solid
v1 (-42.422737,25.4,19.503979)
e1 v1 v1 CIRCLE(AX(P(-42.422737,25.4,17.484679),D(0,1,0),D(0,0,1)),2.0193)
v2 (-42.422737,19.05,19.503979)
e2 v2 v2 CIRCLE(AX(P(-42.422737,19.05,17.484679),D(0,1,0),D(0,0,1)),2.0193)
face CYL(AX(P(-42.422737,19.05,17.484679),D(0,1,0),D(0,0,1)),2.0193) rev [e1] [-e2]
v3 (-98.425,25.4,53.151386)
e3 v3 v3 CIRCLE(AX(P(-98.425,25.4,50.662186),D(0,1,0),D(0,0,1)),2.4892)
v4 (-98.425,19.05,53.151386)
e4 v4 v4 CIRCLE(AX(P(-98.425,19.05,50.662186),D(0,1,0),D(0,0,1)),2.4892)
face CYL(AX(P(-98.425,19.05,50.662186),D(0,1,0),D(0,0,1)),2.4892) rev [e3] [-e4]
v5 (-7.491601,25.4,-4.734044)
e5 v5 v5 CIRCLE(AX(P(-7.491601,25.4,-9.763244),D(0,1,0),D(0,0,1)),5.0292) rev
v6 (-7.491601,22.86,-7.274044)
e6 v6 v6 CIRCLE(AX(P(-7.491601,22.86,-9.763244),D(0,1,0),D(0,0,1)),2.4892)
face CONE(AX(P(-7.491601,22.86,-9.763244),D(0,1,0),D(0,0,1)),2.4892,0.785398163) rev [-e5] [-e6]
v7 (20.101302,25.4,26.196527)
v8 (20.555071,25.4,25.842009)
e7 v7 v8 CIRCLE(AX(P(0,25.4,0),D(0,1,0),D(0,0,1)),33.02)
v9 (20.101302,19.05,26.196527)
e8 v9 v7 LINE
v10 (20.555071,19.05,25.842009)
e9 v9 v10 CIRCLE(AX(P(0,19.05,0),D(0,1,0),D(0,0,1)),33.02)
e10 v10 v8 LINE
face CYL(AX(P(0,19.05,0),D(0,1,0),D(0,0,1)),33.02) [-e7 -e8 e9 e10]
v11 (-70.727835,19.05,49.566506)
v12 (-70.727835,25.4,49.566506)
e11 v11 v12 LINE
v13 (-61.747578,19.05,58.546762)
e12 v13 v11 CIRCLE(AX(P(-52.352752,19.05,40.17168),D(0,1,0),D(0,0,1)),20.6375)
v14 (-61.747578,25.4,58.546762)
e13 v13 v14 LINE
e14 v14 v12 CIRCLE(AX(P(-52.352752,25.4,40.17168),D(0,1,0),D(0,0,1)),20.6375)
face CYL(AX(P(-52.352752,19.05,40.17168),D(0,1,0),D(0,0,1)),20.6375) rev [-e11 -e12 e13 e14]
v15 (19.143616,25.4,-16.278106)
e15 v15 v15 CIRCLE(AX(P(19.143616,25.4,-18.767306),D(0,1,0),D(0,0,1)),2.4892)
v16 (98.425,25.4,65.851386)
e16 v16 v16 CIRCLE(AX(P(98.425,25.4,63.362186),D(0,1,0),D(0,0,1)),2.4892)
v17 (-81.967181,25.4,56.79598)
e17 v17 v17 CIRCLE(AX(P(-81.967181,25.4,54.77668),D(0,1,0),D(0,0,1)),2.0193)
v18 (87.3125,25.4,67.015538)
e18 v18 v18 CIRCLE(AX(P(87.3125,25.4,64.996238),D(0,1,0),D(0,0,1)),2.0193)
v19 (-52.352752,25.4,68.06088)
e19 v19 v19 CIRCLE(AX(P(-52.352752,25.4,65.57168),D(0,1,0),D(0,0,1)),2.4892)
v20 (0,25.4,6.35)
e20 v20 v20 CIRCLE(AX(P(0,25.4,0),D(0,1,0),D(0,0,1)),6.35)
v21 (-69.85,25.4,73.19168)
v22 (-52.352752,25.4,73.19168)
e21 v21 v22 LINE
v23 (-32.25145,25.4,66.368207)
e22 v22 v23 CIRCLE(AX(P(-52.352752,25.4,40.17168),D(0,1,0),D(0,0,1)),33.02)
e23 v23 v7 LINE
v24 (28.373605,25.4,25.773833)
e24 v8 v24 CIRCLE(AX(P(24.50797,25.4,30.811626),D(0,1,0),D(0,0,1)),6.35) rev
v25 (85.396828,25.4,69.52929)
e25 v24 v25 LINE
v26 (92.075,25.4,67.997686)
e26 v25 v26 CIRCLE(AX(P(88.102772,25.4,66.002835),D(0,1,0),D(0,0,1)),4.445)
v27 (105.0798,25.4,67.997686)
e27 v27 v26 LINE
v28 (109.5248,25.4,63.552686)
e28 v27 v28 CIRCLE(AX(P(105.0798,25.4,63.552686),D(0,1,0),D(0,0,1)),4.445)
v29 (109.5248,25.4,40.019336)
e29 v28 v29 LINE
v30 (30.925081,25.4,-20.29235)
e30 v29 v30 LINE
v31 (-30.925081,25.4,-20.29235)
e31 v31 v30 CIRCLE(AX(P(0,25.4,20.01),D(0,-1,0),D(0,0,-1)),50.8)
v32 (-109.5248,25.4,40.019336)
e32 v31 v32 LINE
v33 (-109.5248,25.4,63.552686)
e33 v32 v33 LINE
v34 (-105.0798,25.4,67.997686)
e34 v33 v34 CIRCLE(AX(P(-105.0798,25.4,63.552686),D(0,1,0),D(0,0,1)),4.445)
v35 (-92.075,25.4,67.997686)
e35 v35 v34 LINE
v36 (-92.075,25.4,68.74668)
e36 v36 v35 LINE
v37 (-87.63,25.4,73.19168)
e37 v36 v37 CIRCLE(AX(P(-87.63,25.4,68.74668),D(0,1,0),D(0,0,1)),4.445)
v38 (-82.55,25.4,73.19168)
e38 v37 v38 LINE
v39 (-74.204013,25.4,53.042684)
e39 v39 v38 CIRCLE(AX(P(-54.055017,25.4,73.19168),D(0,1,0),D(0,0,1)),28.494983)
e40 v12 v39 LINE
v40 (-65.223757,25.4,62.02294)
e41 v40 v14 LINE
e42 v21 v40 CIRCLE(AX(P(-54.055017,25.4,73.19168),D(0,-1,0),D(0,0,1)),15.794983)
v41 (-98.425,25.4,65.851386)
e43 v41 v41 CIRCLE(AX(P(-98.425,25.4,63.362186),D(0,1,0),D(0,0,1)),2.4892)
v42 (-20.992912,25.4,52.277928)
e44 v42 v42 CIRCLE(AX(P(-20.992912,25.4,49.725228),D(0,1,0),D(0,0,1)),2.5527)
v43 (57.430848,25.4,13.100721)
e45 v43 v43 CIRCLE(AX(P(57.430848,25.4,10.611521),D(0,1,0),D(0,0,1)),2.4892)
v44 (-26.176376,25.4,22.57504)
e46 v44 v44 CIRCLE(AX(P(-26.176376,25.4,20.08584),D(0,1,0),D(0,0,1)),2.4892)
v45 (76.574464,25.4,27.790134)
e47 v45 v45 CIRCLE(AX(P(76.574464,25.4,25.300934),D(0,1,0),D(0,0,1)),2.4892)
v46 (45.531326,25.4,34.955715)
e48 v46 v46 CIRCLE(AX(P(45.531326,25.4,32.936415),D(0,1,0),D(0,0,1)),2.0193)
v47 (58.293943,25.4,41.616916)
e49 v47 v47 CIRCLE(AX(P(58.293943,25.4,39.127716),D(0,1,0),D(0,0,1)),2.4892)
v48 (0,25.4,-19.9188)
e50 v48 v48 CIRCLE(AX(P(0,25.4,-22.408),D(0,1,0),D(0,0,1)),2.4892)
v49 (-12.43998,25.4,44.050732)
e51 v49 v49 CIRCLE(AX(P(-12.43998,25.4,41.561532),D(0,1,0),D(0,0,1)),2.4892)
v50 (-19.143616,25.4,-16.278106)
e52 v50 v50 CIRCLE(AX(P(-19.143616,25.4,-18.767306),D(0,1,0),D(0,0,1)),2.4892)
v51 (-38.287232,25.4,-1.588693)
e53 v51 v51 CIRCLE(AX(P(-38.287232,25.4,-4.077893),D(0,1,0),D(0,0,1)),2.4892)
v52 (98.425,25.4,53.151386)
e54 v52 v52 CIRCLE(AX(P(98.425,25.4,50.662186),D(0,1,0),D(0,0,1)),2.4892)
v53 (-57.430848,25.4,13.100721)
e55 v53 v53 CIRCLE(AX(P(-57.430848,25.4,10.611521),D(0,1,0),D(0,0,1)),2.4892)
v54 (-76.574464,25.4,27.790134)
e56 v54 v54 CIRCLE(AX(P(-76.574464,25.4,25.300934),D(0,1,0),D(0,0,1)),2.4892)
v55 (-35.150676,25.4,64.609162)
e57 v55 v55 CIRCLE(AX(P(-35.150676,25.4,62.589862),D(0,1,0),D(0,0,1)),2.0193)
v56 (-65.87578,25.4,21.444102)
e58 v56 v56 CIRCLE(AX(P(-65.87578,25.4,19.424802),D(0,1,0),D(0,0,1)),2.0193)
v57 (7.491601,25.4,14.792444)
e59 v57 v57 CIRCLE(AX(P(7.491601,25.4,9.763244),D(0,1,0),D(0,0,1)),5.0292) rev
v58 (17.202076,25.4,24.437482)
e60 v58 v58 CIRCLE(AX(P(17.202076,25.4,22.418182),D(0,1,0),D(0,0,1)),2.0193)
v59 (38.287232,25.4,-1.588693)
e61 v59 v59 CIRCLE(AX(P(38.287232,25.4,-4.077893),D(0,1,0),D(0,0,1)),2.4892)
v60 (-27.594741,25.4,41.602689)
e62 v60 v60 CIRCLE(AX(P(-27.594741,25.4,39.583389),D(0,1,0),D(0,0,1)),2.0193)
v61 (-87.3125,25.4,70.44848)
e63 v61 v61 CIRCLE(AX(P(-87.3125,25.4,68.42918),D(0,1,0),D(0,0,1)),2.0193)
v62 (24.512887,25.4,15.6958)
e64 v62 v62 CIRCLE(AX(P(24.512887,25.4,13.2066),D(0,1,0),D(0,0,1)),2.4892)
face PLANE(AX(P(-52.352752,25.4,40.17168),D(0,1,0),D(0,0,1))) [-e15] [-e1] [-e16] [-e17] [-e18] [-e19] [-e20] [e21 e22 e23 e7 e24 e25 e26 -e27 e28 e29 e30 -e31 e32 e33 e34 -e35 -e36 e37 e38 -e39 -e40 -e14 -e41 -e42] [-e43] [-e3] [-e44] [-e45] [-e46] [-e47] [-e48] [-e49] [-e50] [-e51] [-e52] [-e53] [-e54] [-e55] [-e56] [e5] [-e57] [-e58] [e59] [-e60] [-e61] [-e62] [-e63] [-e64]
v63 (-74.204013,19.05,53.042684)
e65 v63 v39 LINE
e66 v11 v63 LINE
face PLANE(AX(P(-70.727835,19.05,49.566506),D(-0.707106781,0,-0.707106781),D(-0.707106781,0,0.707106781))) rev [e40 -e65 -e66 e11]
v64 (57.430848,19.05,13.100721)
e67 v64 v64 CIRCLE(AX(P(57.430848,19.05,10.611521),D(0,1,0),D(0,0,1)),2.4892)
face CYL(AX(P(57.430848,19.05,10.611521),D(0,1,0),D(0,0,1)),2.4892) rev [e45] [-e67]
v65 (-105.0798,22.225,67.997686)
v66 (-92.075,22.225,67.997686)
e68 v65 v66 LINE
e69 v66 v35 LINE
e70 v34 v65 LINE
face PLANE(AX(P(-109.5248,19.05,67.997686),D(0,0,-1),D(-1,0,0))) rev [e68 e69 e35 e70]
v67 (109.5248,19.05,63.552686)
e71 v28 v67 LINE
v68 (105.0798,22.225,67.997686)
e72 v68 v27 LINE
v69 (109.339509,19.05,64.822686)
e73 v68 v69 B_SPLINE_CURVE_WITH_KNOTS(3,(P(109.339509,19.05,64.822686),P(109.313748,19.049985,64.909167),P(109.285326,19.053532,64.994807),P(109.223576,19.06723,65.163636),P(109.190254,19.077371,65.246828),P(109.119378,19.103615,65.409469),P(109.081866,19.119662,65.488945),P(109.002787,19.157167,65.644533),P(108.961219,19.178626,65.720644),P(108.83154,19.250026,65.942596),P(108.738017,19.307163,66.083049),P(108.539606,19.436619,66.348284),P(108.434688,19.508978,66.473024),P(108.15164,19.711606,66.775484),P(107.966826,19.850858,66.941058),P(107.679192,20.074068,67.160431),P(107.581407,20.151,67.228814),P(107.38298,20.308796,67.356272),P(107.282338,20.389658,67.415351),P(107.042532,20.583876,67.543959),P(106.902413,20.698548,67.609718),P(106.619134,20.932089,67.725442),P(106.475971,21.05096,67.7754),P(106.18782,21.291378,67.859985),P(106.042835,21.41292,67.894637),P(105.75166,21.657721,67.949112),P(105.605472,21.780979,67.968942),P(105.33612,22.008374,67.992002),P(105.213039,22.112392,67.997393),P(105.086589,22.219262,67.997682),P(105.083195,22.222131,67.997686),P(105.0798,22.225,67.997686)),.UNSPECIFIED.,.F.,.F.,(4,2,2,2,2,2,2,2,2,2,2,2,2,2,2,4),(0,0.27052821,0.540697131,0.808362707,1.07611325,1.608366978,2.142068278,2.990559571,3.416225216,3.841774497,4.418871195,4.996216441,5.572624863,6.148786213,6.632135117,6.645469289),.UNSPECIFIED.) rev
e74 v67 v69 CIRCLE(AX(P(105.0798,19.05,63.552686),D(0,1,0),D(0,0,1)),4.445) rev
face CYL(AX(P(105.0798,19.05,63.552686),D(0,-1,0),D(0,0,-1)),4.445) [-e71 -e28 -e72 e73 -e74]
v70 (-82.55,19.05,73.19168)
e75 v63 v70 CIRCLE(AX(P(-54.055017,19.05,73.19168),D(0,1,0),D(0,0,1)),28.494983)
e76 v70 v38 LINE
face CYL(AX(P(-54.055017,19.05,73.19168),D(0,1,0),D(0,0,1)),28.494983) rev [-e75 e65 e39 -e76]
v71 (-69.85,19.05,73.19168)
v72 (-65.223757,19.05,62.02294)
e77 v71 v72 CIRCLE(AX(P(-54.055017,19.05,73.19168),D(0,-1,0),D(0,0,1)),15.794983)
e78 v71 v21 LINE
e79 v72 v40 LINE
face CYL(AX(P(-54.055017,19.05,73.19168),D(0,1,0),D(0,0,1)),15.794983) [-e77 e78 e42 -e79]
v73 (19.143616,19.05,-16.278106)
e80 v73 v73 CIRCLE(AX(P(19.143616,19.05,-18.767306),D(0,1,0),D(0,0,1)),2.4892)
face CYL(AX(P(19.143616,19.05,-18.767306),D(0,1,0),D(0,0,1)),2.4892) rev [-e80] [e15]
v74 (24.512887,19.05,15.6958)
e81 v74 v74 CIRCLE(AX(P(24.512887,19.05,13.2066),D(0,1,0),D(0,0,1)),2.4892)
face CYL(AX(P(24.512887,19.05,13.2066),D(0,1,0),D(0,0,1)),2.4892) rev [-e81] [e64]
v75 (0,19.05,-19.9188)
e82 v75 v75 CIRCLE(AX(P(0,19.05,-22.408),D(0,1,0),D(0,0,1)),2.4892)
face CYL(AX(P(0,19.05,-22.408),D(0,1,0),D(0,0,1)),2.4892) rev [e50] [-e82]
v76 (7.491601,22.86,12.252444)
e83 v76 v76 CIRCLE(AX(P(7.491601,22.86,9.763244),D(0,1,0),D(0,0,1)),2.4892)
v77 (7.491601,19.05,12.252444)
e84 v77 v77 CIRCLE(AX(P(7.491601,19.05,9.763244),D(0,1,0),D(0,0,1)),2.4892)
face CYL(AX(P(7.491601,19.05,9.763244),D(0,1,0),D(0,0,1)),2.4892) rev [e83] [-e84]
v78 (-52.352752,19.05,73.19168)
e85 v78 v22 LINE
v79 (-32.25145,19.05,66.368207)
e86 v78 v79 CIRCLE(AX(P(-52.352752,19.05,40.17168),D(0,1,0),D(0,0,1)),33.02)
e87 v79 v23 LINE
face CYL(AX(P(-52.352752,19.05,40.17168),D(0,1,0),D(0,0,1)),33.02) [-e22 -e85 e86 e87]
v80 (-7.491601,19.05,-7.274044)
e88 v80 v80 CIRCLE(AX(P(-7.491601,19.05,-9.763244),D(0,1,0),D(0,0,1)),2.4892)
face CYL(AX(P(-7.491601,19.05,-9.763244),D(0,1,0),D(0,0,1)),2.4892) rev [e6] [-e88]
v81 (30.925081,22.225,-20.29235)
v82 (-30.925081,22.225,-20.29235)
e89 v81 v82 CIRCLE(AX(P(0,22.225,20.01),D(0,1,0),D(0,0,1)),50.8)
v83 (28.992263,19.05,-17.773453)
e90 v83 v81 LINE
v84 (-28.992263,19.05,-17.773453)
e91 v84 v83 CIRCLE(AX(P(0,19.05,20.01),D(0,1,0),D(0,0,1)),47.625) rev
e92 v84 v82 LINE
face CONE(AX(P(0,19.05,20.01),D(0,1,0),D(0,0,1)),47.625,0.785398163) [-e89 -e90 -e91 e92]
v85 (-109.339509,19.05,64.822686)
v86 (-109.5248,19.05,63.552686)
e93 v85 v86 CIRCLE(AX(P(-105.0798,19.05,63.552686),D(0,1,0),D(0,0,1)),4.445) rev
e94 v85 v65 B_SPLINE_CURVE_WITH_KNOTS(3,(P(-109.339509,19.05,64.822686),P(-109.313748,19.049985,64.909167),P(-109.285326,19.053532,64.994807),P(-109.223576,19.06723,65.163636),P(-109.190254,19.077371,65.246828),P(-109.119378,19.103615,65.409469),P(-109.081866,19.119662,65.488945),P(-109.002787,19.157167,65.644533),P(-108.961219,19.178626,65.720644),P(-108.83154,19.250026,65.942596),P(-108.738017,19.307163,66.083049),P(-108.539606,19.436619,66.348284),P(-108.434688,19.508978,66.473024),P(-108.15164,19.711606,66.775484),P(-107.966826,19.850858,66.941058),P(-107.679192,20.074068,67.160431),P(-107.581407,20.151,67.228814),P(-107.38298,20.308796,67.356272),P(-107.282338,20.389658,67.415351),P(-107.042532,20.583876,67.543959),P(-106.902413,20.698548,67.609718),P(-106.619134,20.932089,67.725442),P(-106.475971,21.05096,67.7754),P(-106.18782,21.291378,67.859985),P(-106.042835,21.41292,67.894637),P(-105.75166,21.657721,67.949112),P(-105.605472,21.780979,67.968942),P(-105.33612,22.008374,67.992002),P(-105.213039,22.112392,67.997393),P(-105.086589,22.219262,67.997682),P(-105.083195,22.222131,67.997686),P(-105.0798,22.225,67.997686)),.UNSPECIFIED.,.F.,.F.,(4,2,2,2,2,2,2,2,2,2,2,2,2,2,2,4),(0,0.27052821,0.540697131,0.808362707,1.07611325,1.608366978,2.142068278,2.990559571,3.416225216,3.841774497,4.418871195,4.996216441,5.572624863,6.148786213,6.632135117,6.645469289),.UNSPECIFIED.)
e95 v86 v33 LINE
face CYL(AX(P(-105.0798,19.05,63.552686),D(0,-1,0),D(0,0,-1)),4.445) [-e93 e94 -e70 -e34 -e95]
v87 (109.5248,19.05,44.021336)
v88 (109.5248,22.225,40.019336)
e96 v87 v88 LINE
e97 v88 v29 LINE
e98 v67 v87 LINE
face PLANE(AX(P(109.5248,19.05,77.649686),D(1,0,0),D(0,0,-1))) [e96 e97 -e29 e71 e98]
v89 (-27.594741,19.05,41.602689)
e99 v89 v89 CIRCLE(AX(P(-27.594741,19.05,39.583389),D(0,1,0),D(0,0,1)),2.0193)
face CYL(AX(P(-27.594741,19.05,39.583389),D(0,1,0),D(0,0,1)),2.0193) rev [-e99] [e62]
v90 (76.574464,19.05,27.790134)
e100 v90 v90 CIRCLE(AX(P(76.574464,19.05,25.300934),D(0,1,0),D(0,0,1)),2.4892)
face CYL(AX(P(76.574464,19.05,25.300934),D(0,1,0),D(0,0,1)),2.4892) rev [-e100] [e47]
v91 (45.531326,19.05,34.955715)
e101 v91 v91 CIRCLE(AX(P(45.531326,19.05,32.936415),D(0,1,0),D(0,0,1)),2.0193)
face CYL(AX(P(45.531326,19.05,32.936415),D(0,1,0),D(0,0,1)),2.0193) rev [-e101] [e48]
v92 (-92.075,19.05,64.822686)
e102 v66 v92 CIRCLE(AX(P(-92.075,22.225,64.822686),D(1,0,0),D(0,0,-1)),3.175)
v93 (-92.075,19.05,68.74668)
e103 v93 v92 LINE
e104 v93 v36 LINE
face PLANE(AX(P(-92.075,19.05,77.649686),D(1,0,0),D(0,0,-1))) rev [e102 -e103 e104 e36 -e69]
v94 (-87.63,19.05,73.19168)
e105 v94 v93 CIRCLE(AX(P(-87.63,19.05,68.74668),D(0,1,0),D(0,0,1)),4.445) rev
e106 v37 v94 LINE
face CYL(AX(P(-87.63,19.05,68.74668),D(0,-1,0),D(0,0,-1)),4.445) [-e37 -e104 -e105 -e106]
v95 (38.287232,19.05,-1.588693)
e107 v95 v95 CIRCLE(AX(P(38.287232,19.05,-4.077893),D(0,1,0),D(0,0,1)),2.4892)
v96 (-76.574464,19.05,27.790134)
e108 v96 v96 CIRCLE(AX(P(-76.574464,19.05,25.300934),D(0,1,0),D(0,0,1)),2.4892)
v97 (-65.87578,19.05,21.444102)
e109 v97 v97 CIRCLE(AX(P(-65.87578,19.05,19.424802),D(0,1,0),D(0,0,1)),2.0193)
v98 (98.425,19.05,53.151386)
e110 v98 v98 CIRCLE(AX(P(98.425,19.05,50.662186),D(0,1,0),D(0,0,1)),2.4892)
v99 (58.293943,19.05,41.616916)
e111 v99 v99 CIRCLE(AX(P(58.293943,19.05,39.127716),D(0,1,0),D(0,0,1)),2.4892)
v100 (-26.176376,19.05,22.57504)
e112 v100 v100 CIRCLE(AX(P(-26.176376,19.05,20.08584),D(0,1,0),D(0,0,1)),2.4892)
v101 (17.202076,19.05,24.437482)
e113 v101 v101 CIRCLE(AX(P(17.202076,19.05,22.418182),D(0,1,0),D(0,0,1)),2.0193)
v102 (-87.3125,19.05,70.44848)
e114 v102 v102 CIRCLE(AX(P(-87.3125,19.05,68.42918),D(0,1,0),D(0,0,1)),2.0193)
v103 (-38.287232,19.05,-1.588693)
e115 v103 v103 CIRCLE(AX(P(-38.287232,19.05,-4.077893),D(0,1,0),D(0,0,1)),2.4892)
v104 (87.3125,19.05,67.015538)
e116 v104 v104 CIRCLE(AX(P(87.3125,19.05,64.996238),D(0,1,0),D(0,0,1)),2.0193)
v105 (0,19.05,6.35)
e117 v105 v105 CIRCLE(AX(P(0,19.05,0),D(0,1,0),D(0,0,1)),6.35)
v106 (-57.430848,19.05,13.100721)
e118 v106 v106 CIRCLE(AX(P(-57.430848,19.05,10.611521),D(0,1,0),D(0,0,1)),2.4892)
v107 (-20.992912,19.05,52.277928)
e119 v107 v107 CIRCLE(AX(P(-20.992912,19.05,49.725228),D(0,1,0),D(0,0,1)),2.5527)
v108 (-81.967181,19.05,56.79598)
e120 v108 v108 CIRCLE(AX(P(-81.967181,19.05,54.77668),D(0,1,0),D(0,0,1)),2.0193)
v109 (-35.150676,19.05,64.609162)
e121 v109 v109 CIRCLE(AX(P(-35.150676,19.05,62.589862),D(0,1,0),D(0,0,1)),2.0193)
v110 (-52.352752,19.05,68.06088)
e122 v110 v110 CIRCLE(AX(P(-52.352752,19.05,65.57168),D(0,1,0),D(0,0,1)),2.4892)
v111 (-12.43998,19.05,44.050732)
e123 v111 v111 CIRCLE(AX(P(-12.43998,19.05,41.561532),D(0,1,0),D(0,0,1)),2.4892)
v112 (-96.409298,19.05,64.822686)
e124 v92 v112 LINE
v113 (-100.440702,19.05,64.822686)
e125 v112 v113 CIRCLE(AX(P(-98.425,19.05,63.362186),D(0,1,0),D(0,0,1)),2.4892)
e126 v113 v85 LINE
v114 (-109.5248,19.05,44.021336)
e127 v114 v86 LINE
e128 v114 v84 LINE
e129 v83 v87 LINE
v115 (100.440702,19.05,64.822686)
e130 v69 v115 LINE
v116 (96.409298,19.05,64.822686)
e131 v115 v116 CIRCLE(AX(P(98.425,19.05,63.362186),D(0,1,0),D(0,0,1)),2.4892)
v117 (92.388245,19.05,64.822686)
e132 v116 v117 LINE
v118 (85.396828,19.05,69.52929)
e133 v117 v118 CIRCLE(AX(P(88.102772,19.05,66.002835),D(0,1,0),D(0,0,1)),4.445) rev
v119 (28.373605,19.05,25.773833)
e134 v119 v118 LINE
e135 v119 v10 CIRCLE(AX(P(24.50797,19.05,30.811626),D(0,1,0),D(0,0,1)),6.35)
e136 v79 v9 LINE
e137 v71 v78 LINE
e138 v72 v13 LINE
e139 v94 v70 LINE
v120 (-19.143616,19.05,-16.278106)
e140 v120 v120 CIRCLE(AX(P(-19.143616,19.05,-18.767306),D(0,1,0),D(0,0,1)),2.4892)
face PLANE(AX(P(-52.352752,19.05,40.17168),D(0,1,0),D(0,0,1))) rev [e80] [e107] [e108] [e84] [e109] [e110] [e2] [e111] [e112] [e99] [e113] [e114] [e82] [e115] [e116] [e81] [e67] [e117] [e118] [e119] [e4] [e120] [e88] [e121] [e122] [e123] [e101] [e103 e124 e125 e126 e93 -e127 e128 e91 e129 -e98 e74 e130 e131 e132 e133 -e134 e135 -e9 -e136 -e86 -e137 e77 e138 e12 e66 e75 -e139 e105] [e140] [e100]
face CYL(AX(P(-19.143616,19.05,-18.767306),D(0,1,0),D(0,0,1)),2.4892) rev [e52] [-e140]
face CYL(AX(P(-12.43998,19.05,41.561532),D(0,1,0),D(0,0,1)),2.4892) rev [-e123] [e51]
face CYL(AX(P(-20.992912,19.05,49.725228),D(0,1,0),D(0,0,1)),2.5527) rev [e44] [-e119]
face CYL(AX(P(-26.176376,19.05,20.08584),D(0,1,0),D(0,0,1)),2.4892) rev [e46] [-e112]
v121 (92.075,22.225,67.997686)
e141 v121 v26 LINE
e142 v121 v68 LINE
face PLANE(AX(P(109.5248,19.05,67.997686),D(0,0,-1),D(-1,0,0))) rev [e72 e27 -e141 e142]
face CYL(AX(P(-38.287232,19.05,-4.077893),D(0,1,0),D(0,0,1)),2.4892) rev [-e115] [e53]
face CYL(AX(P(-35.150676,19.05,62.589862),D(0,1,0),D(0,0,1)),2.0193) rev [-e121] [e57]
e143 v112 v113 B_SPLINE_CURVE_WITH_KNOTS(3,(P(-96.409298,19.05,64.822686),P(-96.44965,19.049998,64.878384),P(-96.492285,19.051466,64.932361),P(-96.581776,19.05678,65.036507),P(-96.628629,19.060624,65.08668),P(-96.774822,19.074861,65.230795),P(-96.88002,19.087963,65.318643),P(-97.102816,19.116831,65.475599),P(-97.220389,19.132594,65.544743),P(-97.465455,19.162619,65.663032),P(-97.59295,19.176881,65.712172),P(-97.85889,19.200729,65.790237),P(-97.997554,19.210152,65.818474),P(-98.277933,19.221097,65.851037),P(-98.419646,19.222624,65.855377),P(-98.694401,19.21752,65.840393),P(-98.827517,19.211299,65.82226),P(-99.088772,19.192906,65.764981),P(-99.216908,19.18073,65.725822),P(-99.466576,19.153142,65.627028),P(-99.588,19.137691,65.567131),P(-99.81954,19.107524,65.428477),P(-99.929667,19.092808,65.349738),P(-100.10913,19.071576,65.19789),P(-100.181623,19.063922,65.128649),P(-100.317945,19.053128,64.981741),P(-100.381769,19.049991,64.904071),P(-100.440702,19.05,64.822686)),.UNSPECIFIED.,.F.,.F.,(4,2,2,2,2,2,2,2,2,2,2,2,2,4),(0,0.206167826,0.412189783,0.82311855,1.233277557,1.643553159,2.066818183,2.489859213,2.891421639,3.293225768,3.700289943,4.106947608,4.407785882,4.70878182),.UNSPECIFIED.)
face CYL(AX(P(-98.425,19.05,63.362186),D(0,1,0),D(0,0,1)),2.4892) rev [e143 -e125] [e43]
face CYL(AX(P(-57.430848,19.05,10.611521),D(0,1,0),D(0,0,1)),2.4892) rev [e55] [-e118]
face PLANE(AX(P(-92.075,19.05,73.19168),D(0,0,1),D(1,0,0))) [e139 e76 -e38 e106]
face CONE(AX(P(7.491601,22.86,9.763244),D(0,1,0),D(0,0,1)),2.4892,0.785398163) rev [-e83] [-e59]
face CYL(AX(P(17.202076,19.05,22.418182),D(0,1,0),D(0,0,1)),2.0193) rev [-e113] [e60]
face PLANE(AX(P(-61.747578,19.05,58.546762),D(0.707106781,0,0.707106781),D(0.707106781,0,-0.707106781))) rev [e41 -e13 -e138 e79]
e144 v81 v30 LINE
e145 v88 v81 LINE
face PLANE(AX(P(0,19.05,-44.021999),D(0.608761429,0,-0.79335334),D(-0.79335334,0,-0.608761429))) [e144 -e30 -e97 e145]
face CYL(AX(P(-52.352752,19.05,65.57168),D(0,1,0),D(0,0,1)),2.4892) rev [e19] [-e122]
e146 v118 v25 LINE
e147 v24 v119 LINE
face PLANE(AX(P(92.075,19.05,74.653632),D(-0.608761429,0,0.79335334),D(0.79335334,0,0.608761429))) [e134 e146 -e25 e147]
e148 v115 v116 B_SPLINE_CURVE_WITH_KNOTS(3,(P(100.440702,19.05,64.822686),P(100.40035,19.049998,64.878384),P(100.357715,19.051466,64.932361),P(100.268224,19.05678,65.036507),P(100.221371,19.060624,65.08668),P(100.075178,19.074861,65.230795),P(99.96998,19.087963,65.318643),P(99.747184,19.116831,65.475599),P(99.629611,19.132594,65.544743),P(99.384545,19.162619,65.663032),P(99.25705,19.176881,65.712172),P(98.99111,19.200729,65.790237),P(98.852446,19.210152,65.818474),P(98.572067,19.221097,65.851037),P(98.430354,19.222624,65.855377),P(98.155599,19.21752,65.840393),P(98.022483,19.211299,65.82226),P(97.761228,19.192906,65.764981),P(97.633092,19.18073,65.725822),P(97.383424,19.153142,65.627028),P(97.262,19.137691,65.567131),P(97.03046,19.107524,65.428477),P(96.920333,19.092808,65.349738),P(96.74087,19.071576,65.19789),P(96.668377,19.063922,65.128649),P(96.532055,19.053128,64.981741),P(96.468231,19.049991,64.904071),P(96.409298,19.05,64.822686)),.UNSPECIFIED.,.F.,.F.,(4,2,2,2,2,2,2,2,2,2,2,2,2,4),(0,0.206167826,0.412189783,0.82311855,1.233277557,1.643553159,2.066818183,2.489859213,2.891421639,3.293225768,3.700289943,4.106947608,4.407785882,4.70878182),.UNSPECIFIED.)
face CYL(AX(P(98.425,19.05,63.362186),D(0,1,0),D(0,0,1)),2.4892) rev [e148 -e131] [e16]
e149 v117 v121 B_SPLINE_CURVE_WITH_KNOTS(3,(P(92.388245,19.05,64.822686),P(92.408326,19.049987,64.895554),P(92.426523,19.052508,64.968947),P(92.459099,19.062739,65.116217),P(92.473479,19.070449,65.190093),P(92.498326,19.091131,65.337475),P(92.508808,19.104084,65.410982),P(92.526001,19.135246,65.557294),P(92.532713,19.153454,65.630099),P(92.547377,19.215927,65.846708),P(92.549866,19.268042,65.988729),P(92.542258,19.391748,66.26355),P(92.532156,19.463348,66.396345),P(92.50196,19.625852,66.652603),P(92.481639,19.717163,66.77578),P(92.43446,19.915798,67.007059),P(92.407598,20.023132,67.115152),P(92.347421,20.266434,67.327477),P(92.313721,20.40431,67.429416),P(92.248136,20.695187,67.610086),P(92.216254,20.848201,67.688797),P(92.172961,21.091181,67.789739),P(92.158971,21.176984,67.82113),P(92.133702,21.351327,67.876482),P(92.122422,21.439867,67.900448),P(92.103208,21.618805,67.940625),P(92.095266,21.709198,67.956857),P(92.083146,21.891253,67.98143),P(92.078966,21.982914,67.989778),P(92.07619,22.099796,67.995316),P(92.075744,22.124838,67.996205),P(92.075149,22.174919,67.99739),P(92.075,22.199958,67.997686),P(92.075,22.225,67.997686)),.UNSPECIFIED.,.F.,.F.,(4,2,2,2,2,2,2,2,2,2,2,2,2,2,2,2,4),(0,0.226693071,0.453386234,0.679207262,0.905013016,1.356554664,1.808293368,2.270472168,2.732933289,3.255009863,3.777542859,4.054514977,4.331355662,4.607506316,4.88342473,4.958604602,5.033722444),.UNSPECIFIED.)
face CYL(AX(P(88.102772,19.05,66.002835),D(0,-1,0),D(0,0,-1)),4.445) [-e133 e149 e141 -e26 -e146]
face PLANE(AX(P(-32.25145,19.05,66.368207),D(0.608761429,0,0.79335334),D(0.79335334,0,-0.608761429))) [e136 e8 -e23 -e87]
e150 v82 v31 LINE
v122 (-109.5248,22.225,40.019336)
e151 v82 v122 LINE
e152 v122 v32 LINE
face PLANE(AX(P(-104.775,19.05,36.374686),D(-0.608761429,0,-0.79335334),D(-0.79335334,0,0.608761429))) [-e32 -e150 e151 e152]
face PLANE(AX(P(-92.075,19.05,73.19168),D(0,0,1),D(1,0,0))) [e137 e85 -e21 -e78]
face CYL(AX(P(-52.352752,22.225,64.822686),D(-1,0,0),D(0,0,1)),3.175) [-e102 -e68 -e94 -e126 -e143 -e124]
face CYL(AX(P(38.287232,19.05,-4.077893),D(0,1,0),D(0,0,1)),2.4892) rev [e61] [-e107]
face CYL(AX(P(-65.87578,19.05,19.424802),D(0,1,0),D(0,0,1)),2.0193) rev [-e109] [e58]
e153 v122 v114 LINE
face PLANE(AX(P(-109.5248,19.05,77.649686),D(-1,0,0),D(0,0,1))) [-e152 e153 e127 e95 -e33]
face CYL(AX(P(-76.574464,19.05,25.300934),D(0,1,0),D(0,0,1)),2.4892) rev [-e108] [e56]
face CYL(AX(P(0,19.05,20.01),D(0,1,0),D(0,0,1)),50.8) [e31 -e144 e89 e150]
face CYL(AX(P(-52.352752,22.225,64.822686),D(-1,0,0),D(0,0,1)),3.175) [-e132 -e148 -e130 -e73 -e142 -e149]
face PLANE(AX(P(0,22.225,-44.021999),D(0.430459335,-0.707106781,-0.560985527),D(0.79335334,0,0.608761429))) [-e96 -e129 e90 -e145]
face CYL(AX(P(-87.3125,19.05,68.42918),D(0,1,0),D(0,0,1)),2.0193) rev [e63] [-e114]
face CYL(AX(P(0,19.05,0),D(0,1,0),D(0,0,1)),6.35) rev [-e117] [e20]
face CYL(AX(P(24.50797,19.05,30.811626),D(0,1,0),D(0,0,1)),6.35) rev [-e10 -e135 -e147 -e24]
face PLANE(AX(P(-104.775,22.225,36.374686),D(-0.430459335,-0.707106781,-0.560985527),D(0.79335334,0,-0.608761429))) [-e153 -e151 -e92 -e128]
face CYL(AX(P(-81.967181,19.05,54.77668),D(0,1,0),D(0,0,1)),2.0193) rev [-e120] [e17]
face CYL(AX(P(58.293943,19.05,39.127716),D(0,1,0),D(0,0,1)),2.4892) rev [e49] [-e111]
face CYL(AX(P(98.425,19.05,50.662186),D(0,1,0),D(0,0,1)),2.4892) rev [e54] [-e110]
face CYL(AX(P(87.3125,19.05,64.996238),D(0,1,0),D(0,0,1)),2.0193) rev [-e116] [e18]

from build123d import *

# Parameters (mm, degrees)
SKETCH3_R                          = 20.6375
SKETCH3_R_2                        = 6.35
BOSS_EXTRUDE1_DEPTH                = 6.35
SKETCH8_W                          = 4.7498
SKETCH8_H                          = 41.275
BOSS_EXTRUDE4_DEPTH                = 6.35
SKETCH9_R                          = 2.4892
COLLAR_HOLES_DEPTH                 = 135.407879484
SKETCH10_R                         = 2.0193
SPACER_HOLES_DEPTH                 = 135.407879484
SPACER_HOLE_PATTERN_COUNT          = 5
SPACER_HOLE_PATTERN_PITCH          = 24.13
SPACER_HOLE_MIRROR_COPY_1_SKETCH_R = 2.0193
SPACER_HOLE_MIRROR_COPY_1_DEPTH    = 135.407879484
SPACER_HOLE_MIRROR_COPY_2_SKETCH_R = 2.0193
SPACER_HOLE_MIRROR_COPY_2_DEPTH    = 135.407879484
SPACER_HOLE_MIRROR_COPY_3_SKETCH_R = 2.0193
SPACER_HOLE_MIRROR_COPY_3_DEPTH    = 135.407879484
SPACER_HOLE_MIRROR_COPY_4_SKETCH_R = 2.0193
SPACER_HOLE_MIRROR_COPY_4_DEPTH    = 135.407879484
SPACER_HOLE_MIRROR_COPY_5_SKETCH_R = 2.0193
SPACER_HOLE_MIRROR_COPY_5_DEPTH    = 135.407879484
SKETCH16_R                         = 2.0193
CUSTOM_NUTSTRIP_HOLES_DEPTH        = 135.407879484
SKETCH36_R                         = 2.0193
AUX_SPACER_HOLES_DEPTH             = 135.407879484
SKETCH49_R                         = 2.0193
CUT_EXTRUDE23_DEPTH                = 135.407879484
SKETCH50_R                         = 2.0193
CUT_EXTRUDE24_DEPTH                = 135.407879484
SKETCH58_R                         = 2.0193
CUT_EXTRUDE30_DEPTH                = 135.407879484
SKETCH11_R                         = 2.4892
ENLARGE_SPACER_HOLES_DEPTH         = 135.407879484
TOP_CHAMFER_SIZE                   = 2.54
CUT_EXTRUDE34_DEPTH                = 135.407879484
CUT_EXTRUDE52_DEPTH                = 135.407879484
SKETCH110_W                        = 17.4498
SKETCH110_H                        = 9.652
CUT_EXTRUDE56_DEPTH                = 135.407879484
CHAMFER4_SIZE                      = 3.175
FILLET21_R                         = 6.35
FILLET41_R                         = 4.445
FILLET45_R                         = 3.175
SKETCH112_R                        = 2.5527
CUT_EXTRUDE57_DEPTH                = 132.882623246


with BuildPart() as part:
    # Sketch3 → Boss-Extrude1 (new body)
    with BuildSketch(Plane(origin=(0, 25.4, 0), x_dir=(1, 0, 0), z_dir=(0, 1, 0))):
        with BuildLine():
            Line((-104.775, -36.374686106), (-30.925080594, 20.292350114))
            Line((-30.925080594, 20.292350114), (0, 44.021999059))
            Line((0, 44.021999059), (30.925080594, 20.292350114))
            Line((30.925080594, 20.292350114), (104.775, -36.374686106))
            Line((104.775, -36.374686106), (104.775, -77.649686106))
            Line((104.775, -77.649686106), (92.075, -77.649686106))
            Line((92.075, -77.649686106), (92.075, -74.653632333))
            Line((92.075, -74.653632333), (24.142327736, -22.527059539))
            ThreePointArc((24.142327736, -22.527059539), (22.197769032, -24.445438225), (20.101302386, -26.196527296))
            Line((20.101302386, -26.196527296), (-32.251449857, -66.368206988))
            ThreePointArc((-32.251449857, -66.368206988), (-41.738821099, -71.439312567), (-52.352752243, -73.191679691))
            Line((-52.352752243, -73.191679691), (-92.075, -73.191679691))
            Line((-92.075, -73.191679691), (-92.075, -77.649686106))
            Line((-92.075, -77.649686106), (-104.775, -77.649686106))
            Line((-104.775, -77.649686106), (-104.775, -36.374686106))
        make_face()
        with Locations(Location((-52.352752243, -40.171679691, 0), (0, 0, 270))):
            Circle(SKETCH3_R, mode=Mode.SUBTRACT)
        with Locations(Location((0, 0, 0), (0, 0, 270))):
            Circle(SKETCH3_R_2, mode=Mode.SUBTRACT)
    extrude(amount=-BOSS_EXTRUDE1_DEPTH)

    # Sketch8 → Boss-Extrude4 (add, through all)
    with BuildSketch(Plane(origin=(0, 25.4, 0), x_dir=(1, 0, 0), z_dir=(0, 1, 0))):
        with Locations((-107.1499, -57.012186106)):
            Rectangle(SKETCH8_W, SKETCH8_H)
        with Locations((107.1499, -57.012186106)):
            Rectangle(SKETCH8_W, SKETCH8_H)
    extrude(amount=-BOSS_EXTRUDE4_DEPTH)

    # Sketch9 → Collar Holes (cut, through all)
    with BuildSketch(Plane(origin=(0, 25.4, 0), x_dir=(1, 0, 0), z_dir=(0, 1, 0))):
        with Locations(Location((-7.491600774, 9.763244212, 0), (0, 0, 270))):
            Circle(SKETCH9_R)
        with Locations(Location((7.491600774, -9.763244212, 0), (0, 0, 270))):
            Circle(SKETCH9_R)
    extrude(amount=-COLLAR_HOLES_DEPTH, mode=Mode.SUBTRACT)

    # Sketch10 → Spacer Holes (cut, through all)
    with BuildSketch(Plane(origin=(0, 25.4, 0), x_dir=(1, 0, 0), z_dir=(0, 1, 0))):
        with Locations(Location((0, 33.456719285, 0), (0, 0, 270))):
            Circle(SKETCH10_R)
    spacer_holes = extrude(amount=-SPACER_HOLES_DEPTH, mode=Mode.SUBTRACT)

    # Spacer Hole Pattern: Spacer Holes ×5
    with Locations(*[Vector(-0.7933533402912316, 0, 0.6087614290087253) * (i * SPACER_HOLE_PATTERN_PITCH) for i in range(1, SPACER_HOLE_PATTERN_COUNT)]):
        add(spacer_holes, mode=Mode.SUBTRACT)

    # Spacer Hole Mirror copy 1 sketch → Spacer Hole Mirror copy 1 (cut, through all)
    with BuildSketch(Plane(origin=(19.143616101, 25.4, 14.689413282), x_dir=(-1, 0, 0), z_dir=(0, 1, 0))):
        with Locations((0, -33.456719285)):
            Circle(SPACER_HOLE_MIRROR_COPY_1_SKETCH_R)
    extrude(amount=-SPACER_HOLE_MIRROR_COPY_1_DEPTH, mode=Mode.SUBTRACT)

    # Spacer Hole Mirror copy 2 sketch → Spacer Hole Mirror copy 2 (cut, through all)
    with BuildSketch(Plane(origin=(38.287232202, 25.4, 29.378826564), x_dir=(-1, 0, 0), z_dir=(0, 1, 0))):
        with Locations((0, -33.456719285)):
            Circle(SPACER_HOLE_MIRROR_COPY_2_SKETCH_R)
    extrude(amount=-SPACER_HOLE_MIRROR_COPY_2_DEPTH, mode=Mode.SUBTRACT)

    # Spacer Hole Mirror copy 3 sketch → Spacer Hole Mirror copy 3 (cut, through all)
    with BuildSketch(Plane(origin=(57.430848304, 25.4, 44.068239846), x_dir=(-1, 0, 0), z_dir=(0, 1, 0))):
        with Locations((0, -33.456719285)):
            Circle(SPACER_HOLE_MIRROR_COPY_3_SKETCH_R)
    extrude(amount=-SPACER_HOLE_MIRROR_COPY_3_DEPTH, mode=Mode.SUBTRACT)

    # Spacer Hole Mirror copy 4 sketch → Spacer Hole Mirror copy 4 (cut, through all)
    with BuildSketch(Plane(origin=(76.574464405, 25.4, 58.757653128), x_dir=(-1, 0, 0), z_dir=(0, 1, 0))):
        with Locations((0, -33.456719285)):
            Circle(SPACER_HOLE_MIRROR_COPY_4_SKETCH_R)
    extrude(amount=-SPACER_HOLE_MIRROR_COPY_4_DEPTH, mode=Mode.SUBTRACT)

    # Spacer Hole Mirror copy 5 sketch → Spacer Hole Mirror copy 5 (cut, through all)
    with BuildSketch(Plane(origin=(0, 25.4, 0), x_dir=(-1, 0, 0), z_dir=(0, 1, 0))):
        with Locations((0, -33.456719285)):
            Circle(SPACER_HOLE_MIRROR_COPY_5_SKETCH_R)
    extrude(amount=-SPACER_HOLE_MIRROR_COPY_5_DEPTH, mode=Mode.SUBTRACT)

    # Sketch16 → Custom Nutstrip Holes (cut, through all)
    with BuildSketch(Plane(origin=(0, 25.4, 0), x_dir=(1, 0, 0), z_dir=(0, 1, 0))):
        with Locations(Location((-98.425, -50.662186106, 0), (0, 0, 270))):
            Circle(SKETCH16_R)
        with Locations(Location((-98.425, -63.362186106, 0), (0, 0, 270))):
            Circle(SKETCH16_R)
        with Locations(Location((98.425, -63.362186106, 0), (0, 0, 90))):
            Circle(SKETCH16_R)
        with Locations(Location((98.425, -50.662186106, 0), (0, 0, 90))):
            Circle(SKETCH16_R)
    extrude(amount=-CUSTOM_NUTSTRIP_HOLES_DEPTH, mode=Mode.SUBTRACT)

    # Sketch36 → Aux Spacer Holes (cut, through all)
    with BuildSketch(Plane(origin=(0, 25.4, 0), x_dir=(1, 0, 0), z_dir=(0, 1, 0))):
        with Locations(Location((-52.352752243, -65.571679691, 0), (0, 0, 270))):
            Circle(SKETCH36_R)
        with Locations(Location((58.293943402, -39.127716128, 0), (0, 0, 270))):
            Circle(SKETCH36_R)
        with Locations(Location((24.512886804, -13.206599718, 0), (0, 0, 270))):
            Circle(SKETCH36_R)
        with Locations(Location((-12.439980265, -41.561531903, 0), (0, 0, 270))):
            Circle(SKETCH36_R)
        with Locations(Location((-26.176376122, -20.085839846, 0), (0, 0, 270))):
            Circle(SKETCH36_R)
    extrude(amount=-AUX_SPACER_HOLES_DEPTH, mode=Mode.SUBTRACT)

    # Sketch49 → Cut-Extrude23 (cut, through all)
    with BuildSketch(Plane(origin=(0, 25.4, 0), x_dir=(1, 0, 0), z_dir=(0, 1, 0))):
        with Locations(Location((-81.967180737, -54.776679691, 0), (0, 0, 270))):
            Circle(SKETCH49_R)
        with Locations(Location((-65.875779659, -19.424801504, 0), (0, 0, 270))):
            Circle(SKETCH49_R)
        with Locations(Location((-42.422737009, -17.484678513, 0), (0, 0, 270))):
            Circle(SKETCH49_R)
        with Locations(Location((-27.594740634, -39.583388821, 0), (0, 0, 270))):
            Circle(SKETCH49_R)
    extrude(amount=-CUT_EXTRUDE23_DEPTH, mode=Mode.SUBTRACT)

    # Sketch50 → Cut-Extrude24 (cut, through all)
    with BuildSketch(Plane(origin=(0, 25.4, 0), x_dir=(1, 0, 0), z_dir=(0, 1, 0))):
        with Locations(Location((-87.3125, -68.429179691, 0), (0, 0, 270))):
            Circle(SKETCH50_R)
        with Locations(Location((-35.150676163, -62.589861704, 0), (0, 0, 270))):
            Circle(SKETCH50_R)
        with Locations(Location((17.20207608, -22.418182013, 0), (0, 0, 270))):
            Circle(SKETCH50_R)
        with Locations(Location((45.531325629, -32.936414996, 0), (0, 0, 270))):
            Circle(SKETCH50_R)
        with Locations(Location((87.3125, -64.996237681, 0), (0, 0, 270))):
            Circle(SKETCH50_R)
    extrude(amount=-CUT_EXTRUDE24_DEPTH, mode=Mode.SUBTRACT)

    # Sketch58 → Cut-Extrude30 (cut, through all)
    with BuildSketch(Plane(origin=(0, 25.4, 0), x_dir=(1, 0, 0), z_dir=(0, 1, 0))):
        with Locations(Location((0, 22.408000428, 0), (0, 0, 270))):
            Circle(SKETCH58_R)
        with BuildLine():
            Line((-30.925080594, 20.292350114), (0, 44.021999059))
            Line((0, 44.021999059), (30.925080594, 20.292350114))
            ThreePointArc((30.925080594, 20.292350114), (0, 30.790000428), (-30.925080594, 20.292350114))
        make_face()
    extrude(amount=-CUT_EXTRUDE30_DEPTH, mode=Mode.SUBTRACT)

    # Sketch11 → Enlarge Spacer Holes (cut, through all)
    with BuildSketch(Plane(origin=(0, 25.4, 0), x_dir=(1, 0, 0), z_dir=(0, 1, 0))):
        with Locations(Location((0, 22.408000428, 0), (0, 0, 270))):
            Circle(SKETCH11_R)
        with Locations(Location((-76.574464405, -25.300933843, 0), (0, 0, 270))):
            Circle(SKETCH11_R)
        with Locations(Location((-57.430848304, -10.611520561, 0), (0, 0, 270))):
            Circle(SKETCH11_R)
        with Locations(Location((-38.287232202, 4.077892721, 0), (0, 0, 270))):
            Circle(SKETCH11_R)
        with Locations(Location((-19.143616101, 18.767306003, 0), (0, 0, 270))):
            Circle(SKETCH11_R)
        with Locations(Location((19.143616101, 18.767306003, 0), (0, 0, 270))):
            Circle(SKETCH11_R)
        with Locations(Location((38.287232202, 4.077892721, 0), (0, 0, 270))):
            Circle(SKETCH11_R)
        with Locations(Location((57.430848304, -10.611520561, 0), (0, 0, 270))):
            Circle(SKETCH11_R)
        with Locations(Location((76.574464405, -25.300933843, 0), (0, 0, 270))):
            Circle(SKETCH11_R)
        with Locations(Location((-52.352752243, -65.571679691, 0), (0, 0, 270))):
            Circle(SKETCH11_R)
        with Locations(Location((-98.425, -50.662186106, 0), (0, 0, 270))):
            Circle(SKETCH11_R)
        with Locations(Location((-98.425, -63.362186106, 0), (0, 0, 270))):
            Circle(SKETCH11_R)
        with Locations(Location((98.425, -50.662186106, 0), (0, 0, 270))):
            Circle(SKETCH11_R)
        with Locations(Location((98.425, -63.362186106, 0), (0, 0, 270))):
            Circle(SKETCH11_R)
        with Locations(Location((-26.176376122, -20.085839846, 0), (0, 0, 270))):
            Circle(SKETCH11_R)
        with Locations(Location((-12.439980265, -41.561531903, 0), (0, 0, 270))):
            Circle(SKETCH11_R)
        with Locations(Location((24.512886804, -13.206599718, 0), (0, 0, 270))):
            Circle(SKETCH11_R)
        with Locations(Location((58.293943402, -39.127716128, 0), (0, 0, 270))):
            Circle(SKETCH11_R)
    extrude(amount=-ENLARGE_SPACER_HOLES_DEPTH, mode=Mode.SUBTRACT)

    # Top Chamfer
    top_chamfer_edges = [part.edges().sort_by_distance(p)[0] for p in [
        (-7.491600774, 25.4, -12.252444212),
        (7.491600774, 25.4, 7.274044212),
    ]]
    chamfer(top_chamfer_edges, length=TOP_CHAMFER_SIZE)

    # Sketch75 → Cut-Extrude34 (cut, through all)
    with BuildSketch(Plane(origin=(0, 25.4, 0), x_dir=(1, 0, 0), z_dir=(0, 1, 0))):
        Polygon((-104.775, -36.374686106), (-109.5248, -40.019335834), (-109.5248, -36.374686106), align=None)
        Polygon((104.775, -36.374686106), (109.5248, -40.019335834), (109.5248, -36.374686106), align=None)
    extrude(amount=-CUT_EXTRUDE34_DEPTH, mode=Mode.SUBTRACT)

    # Sketch101 → Cut-Extrude52 (cut, through all)
    with BuildSketch(Plane(origin=(0, 25.4, 0), x_dir=(1, 0, 0), z_dir=(0, 1, 0))):
        with BuildLine():
            Line((-61.747578382, -58.546761951), (-65.223756626, -62.022940195))
            ThreePointArc((-65.223756626, -62.022940195), (-68.64767852, -67.147201432), (-69.85, -73.191679691))
            Line((-69.85, -73.191679691), (-82.55, -73.191679691))
            ThreePointArc((-82.55, -73.191679691), (-80.380948583, -62.287121841), (-74.204012747, -53.042684074))
            Line((-74.204012747, -53.042684074), (-70.727834503, -49.56650583))
            Line((-70.727834503, -49.56650583), (-61.747578382, -58.546761951))
        make_face()
    extrude(amount=-CUT_EXTRUDE52_DEPTH, mode=Mode.SUBTRACT)

    # Sketch110 → Cut-Extrude56 (cut, through all)
    with BuildSketch(Plane(origin=(0, 25.4, 0), x_dir=(1, 0, 0), z_dir=(0, 1, 0))):
        with Locations((-100.7999, -72.823686106)):
            Rectangle(SKETCH110_W, SKETCH110_H)
        with Locations((100.7999, -72.823686106)):
            Rectangle(SKETCH110_W, SKETCH110_H)
    extrude(amount=-CUT_EXTRUDE56_DEPTH, mode=Mode.SUBTRACT)

    # Chamfer4
    chamfer4_edges = [part.edges().sort_by_distance(p)[0] for p in [
        (-70.224940297, 19.05, 9.86349286),
        (0, 19.05, -30.790000428),
        (70.224940297, 19.05, 9.86349286),
    ]]
    chamfer(chamfer4_edges, length=CHAMFER4_SIZE)

    # Fillet21
    fillet21_edges = [part.edges().sort_by_distance(p)[0] for p in [
        (24.142327736, 22.225, 22.527059539),
    ]]
    fillet(fillet21_edges, radius=FILLET21_R)

    # Fillet41
    # the kernel refuses this fillet: 4.445 mm, written as the material it takes off along each edge
    with BuildSketch(Plane(origin=(109.5248, 36.5125, 67.997686106), x_dir=(-1, 0, 0), z_dir=(0, -1, 0)), Plane(origin=(-109.5248, 36.5125, 67.997686106), x_dir=(0, 0, -1), z_dir=(0, -1, 0))) as fillet41_piece_1:
        with BuildLine():
            CenterArc((FILLET41_R, FILLET41_R), FILLET41_R, 180, 90)
            Line((0, FILLET41_R), (-FILLET41_R * 0.02, FILLET41_R))
            Line((-FILLET41_R * 0.02, FILLET41_R), (-FILLET41_R * 0.02, -FILLET41_R * 0.02))
            Line((-FILLET41_R * 0.02, -FILLET41_R * 0.02), (FILLET41_R, -FILLET41_R * 0.02))
            Line((FILLET41_R, -FILLET41_R * 0.02), (FILLET41_R, 0))
        make_face()
    extrude(amount=28.575, mode=Mode.SUBTRACT)
    with BuildSketch(Plane(origin=(92.075, 46.444130009, 74.653632333), x_dir=(-0.7933533402912316, 0, -0.6087614290087255), z_dir=(0, -1, 0))) as fillet41_piece_2:
        with BuildLine():
            CenterArc((8.417652003, 4.445), FILLET41_R, 169.165785029, 100.834214971)
            Line((4.051883336, 5.280517172), (3.964567963, 5.297227515))
            ThreePointArc((3.964567963, 5.297227515), (1.955412556, 2.694377477), (-0.070529112, 0.054118891))
            Line((-0.070529112, 0.054118891), (0, -0.0889))
            Line((0, -0.0889), (8.417652003, -0.0889))
            Line((8.417652003, -0.0889), (8.417652003, 0))
        make_face()
    extrude(amount=48.438260017, mode=Mode.SUBTRACT)
    with BuildSketch(Plane(origin=(-92.075, 36.5125, 73.191679691), x_dir=(1, 0, 0), z_dir=(0, -1, 0))) as fillet41_piece_3:
        with BuildLine():
            CenterArc((FILLET41_R, -FILLET41_R), FILLET41_R, 90, 90)
            Line((0, -FILLET41_R), (-FILLET41_R * 0.02, -FILLET41_R))
            Line((-FILLET41_R * 0.02, -FILLET41_R), (-FILLET41_R * 0.02, FILLET41_R * 0.02))
            Line((-FILLET41_R * 0.02, FILLET41_R * 0.02), (FILLET41_R, FILLET41_R * 0.02))
            Line((FILLET41_R, FILLET41_R * 0.02), (FILLET41_R, 0))
        make_face()
    extrude(amount=28.575, mode=Mode.SUBTRACT)

    # Fillet45
    # the kernel refuses this fillet: 3.175 mm, written as the material it takes off along each edge
    with BuildSketch(Plane(origin=(-113.0173, 19.05, 67.997686106), x_dir=(0, 1, 0), z_dir=(1, 0, 0))) as fillet45_piece_1:
        with BuildLine():
            CenterArc((FILLET45_R, -FILLET45_R), FILLET45_R, 90, 90)
            Line((0, -FILLET45_R), (0, 0))
            Line((0, 0), (FILLET45_R, 0))
        make_face()
    extrude(amount=20.9423, mode=Mode.SUBTRACT)
    with BuildSketch(Plane(origin=(113.0173, 19.05, 67.997686106), x_dir=(0, 1, 0), z_dir=(-1, 0, 0))) as fillet45_piece_2_section:
        with BuildLine():
            CenterArc((FILLET45_R, FILLET45_R), FILLET45_R, 180, 90)
            Line((0, FILLET45_R), (0, 0))
            Line((0, 0), (FILLET45_R, 0))
        make_face()
    fillet45_piece_2 = extrude(amount=28.8798, mode=Mode.PRIVATE)
    fillet45_piece_2 = fillet45_piece_2 - Plane(origin=(88.102772218, 19.593814114, 66.002834873), x_dir=(-0.7933533402910131, 0, -0.6087614290090101), z_dir=(0, 1, 0)) * Cylinder(4.445, 71, mode=Mode.PRIVATE)
    add(fillet45_piece_2, mode=Mode.SUBTRACT)

    # Sketch112 → Cut-Extrude57 (cut, through all)
    with BuildSketch(Plane(origin=(0, 25.4, 0), x_dir=(1, 0, 0), z_dir=(0, 1, 0))):
        with Locations(Location((-20.992912415, -49.725227534, 0), (0, 0, 270))):
            Circle(SKETCH112_R)
    extrude(amount=-CUT_EXTRUDE57_DEPTH, mode=Mode.SUBTRACT)


solid = part.part
